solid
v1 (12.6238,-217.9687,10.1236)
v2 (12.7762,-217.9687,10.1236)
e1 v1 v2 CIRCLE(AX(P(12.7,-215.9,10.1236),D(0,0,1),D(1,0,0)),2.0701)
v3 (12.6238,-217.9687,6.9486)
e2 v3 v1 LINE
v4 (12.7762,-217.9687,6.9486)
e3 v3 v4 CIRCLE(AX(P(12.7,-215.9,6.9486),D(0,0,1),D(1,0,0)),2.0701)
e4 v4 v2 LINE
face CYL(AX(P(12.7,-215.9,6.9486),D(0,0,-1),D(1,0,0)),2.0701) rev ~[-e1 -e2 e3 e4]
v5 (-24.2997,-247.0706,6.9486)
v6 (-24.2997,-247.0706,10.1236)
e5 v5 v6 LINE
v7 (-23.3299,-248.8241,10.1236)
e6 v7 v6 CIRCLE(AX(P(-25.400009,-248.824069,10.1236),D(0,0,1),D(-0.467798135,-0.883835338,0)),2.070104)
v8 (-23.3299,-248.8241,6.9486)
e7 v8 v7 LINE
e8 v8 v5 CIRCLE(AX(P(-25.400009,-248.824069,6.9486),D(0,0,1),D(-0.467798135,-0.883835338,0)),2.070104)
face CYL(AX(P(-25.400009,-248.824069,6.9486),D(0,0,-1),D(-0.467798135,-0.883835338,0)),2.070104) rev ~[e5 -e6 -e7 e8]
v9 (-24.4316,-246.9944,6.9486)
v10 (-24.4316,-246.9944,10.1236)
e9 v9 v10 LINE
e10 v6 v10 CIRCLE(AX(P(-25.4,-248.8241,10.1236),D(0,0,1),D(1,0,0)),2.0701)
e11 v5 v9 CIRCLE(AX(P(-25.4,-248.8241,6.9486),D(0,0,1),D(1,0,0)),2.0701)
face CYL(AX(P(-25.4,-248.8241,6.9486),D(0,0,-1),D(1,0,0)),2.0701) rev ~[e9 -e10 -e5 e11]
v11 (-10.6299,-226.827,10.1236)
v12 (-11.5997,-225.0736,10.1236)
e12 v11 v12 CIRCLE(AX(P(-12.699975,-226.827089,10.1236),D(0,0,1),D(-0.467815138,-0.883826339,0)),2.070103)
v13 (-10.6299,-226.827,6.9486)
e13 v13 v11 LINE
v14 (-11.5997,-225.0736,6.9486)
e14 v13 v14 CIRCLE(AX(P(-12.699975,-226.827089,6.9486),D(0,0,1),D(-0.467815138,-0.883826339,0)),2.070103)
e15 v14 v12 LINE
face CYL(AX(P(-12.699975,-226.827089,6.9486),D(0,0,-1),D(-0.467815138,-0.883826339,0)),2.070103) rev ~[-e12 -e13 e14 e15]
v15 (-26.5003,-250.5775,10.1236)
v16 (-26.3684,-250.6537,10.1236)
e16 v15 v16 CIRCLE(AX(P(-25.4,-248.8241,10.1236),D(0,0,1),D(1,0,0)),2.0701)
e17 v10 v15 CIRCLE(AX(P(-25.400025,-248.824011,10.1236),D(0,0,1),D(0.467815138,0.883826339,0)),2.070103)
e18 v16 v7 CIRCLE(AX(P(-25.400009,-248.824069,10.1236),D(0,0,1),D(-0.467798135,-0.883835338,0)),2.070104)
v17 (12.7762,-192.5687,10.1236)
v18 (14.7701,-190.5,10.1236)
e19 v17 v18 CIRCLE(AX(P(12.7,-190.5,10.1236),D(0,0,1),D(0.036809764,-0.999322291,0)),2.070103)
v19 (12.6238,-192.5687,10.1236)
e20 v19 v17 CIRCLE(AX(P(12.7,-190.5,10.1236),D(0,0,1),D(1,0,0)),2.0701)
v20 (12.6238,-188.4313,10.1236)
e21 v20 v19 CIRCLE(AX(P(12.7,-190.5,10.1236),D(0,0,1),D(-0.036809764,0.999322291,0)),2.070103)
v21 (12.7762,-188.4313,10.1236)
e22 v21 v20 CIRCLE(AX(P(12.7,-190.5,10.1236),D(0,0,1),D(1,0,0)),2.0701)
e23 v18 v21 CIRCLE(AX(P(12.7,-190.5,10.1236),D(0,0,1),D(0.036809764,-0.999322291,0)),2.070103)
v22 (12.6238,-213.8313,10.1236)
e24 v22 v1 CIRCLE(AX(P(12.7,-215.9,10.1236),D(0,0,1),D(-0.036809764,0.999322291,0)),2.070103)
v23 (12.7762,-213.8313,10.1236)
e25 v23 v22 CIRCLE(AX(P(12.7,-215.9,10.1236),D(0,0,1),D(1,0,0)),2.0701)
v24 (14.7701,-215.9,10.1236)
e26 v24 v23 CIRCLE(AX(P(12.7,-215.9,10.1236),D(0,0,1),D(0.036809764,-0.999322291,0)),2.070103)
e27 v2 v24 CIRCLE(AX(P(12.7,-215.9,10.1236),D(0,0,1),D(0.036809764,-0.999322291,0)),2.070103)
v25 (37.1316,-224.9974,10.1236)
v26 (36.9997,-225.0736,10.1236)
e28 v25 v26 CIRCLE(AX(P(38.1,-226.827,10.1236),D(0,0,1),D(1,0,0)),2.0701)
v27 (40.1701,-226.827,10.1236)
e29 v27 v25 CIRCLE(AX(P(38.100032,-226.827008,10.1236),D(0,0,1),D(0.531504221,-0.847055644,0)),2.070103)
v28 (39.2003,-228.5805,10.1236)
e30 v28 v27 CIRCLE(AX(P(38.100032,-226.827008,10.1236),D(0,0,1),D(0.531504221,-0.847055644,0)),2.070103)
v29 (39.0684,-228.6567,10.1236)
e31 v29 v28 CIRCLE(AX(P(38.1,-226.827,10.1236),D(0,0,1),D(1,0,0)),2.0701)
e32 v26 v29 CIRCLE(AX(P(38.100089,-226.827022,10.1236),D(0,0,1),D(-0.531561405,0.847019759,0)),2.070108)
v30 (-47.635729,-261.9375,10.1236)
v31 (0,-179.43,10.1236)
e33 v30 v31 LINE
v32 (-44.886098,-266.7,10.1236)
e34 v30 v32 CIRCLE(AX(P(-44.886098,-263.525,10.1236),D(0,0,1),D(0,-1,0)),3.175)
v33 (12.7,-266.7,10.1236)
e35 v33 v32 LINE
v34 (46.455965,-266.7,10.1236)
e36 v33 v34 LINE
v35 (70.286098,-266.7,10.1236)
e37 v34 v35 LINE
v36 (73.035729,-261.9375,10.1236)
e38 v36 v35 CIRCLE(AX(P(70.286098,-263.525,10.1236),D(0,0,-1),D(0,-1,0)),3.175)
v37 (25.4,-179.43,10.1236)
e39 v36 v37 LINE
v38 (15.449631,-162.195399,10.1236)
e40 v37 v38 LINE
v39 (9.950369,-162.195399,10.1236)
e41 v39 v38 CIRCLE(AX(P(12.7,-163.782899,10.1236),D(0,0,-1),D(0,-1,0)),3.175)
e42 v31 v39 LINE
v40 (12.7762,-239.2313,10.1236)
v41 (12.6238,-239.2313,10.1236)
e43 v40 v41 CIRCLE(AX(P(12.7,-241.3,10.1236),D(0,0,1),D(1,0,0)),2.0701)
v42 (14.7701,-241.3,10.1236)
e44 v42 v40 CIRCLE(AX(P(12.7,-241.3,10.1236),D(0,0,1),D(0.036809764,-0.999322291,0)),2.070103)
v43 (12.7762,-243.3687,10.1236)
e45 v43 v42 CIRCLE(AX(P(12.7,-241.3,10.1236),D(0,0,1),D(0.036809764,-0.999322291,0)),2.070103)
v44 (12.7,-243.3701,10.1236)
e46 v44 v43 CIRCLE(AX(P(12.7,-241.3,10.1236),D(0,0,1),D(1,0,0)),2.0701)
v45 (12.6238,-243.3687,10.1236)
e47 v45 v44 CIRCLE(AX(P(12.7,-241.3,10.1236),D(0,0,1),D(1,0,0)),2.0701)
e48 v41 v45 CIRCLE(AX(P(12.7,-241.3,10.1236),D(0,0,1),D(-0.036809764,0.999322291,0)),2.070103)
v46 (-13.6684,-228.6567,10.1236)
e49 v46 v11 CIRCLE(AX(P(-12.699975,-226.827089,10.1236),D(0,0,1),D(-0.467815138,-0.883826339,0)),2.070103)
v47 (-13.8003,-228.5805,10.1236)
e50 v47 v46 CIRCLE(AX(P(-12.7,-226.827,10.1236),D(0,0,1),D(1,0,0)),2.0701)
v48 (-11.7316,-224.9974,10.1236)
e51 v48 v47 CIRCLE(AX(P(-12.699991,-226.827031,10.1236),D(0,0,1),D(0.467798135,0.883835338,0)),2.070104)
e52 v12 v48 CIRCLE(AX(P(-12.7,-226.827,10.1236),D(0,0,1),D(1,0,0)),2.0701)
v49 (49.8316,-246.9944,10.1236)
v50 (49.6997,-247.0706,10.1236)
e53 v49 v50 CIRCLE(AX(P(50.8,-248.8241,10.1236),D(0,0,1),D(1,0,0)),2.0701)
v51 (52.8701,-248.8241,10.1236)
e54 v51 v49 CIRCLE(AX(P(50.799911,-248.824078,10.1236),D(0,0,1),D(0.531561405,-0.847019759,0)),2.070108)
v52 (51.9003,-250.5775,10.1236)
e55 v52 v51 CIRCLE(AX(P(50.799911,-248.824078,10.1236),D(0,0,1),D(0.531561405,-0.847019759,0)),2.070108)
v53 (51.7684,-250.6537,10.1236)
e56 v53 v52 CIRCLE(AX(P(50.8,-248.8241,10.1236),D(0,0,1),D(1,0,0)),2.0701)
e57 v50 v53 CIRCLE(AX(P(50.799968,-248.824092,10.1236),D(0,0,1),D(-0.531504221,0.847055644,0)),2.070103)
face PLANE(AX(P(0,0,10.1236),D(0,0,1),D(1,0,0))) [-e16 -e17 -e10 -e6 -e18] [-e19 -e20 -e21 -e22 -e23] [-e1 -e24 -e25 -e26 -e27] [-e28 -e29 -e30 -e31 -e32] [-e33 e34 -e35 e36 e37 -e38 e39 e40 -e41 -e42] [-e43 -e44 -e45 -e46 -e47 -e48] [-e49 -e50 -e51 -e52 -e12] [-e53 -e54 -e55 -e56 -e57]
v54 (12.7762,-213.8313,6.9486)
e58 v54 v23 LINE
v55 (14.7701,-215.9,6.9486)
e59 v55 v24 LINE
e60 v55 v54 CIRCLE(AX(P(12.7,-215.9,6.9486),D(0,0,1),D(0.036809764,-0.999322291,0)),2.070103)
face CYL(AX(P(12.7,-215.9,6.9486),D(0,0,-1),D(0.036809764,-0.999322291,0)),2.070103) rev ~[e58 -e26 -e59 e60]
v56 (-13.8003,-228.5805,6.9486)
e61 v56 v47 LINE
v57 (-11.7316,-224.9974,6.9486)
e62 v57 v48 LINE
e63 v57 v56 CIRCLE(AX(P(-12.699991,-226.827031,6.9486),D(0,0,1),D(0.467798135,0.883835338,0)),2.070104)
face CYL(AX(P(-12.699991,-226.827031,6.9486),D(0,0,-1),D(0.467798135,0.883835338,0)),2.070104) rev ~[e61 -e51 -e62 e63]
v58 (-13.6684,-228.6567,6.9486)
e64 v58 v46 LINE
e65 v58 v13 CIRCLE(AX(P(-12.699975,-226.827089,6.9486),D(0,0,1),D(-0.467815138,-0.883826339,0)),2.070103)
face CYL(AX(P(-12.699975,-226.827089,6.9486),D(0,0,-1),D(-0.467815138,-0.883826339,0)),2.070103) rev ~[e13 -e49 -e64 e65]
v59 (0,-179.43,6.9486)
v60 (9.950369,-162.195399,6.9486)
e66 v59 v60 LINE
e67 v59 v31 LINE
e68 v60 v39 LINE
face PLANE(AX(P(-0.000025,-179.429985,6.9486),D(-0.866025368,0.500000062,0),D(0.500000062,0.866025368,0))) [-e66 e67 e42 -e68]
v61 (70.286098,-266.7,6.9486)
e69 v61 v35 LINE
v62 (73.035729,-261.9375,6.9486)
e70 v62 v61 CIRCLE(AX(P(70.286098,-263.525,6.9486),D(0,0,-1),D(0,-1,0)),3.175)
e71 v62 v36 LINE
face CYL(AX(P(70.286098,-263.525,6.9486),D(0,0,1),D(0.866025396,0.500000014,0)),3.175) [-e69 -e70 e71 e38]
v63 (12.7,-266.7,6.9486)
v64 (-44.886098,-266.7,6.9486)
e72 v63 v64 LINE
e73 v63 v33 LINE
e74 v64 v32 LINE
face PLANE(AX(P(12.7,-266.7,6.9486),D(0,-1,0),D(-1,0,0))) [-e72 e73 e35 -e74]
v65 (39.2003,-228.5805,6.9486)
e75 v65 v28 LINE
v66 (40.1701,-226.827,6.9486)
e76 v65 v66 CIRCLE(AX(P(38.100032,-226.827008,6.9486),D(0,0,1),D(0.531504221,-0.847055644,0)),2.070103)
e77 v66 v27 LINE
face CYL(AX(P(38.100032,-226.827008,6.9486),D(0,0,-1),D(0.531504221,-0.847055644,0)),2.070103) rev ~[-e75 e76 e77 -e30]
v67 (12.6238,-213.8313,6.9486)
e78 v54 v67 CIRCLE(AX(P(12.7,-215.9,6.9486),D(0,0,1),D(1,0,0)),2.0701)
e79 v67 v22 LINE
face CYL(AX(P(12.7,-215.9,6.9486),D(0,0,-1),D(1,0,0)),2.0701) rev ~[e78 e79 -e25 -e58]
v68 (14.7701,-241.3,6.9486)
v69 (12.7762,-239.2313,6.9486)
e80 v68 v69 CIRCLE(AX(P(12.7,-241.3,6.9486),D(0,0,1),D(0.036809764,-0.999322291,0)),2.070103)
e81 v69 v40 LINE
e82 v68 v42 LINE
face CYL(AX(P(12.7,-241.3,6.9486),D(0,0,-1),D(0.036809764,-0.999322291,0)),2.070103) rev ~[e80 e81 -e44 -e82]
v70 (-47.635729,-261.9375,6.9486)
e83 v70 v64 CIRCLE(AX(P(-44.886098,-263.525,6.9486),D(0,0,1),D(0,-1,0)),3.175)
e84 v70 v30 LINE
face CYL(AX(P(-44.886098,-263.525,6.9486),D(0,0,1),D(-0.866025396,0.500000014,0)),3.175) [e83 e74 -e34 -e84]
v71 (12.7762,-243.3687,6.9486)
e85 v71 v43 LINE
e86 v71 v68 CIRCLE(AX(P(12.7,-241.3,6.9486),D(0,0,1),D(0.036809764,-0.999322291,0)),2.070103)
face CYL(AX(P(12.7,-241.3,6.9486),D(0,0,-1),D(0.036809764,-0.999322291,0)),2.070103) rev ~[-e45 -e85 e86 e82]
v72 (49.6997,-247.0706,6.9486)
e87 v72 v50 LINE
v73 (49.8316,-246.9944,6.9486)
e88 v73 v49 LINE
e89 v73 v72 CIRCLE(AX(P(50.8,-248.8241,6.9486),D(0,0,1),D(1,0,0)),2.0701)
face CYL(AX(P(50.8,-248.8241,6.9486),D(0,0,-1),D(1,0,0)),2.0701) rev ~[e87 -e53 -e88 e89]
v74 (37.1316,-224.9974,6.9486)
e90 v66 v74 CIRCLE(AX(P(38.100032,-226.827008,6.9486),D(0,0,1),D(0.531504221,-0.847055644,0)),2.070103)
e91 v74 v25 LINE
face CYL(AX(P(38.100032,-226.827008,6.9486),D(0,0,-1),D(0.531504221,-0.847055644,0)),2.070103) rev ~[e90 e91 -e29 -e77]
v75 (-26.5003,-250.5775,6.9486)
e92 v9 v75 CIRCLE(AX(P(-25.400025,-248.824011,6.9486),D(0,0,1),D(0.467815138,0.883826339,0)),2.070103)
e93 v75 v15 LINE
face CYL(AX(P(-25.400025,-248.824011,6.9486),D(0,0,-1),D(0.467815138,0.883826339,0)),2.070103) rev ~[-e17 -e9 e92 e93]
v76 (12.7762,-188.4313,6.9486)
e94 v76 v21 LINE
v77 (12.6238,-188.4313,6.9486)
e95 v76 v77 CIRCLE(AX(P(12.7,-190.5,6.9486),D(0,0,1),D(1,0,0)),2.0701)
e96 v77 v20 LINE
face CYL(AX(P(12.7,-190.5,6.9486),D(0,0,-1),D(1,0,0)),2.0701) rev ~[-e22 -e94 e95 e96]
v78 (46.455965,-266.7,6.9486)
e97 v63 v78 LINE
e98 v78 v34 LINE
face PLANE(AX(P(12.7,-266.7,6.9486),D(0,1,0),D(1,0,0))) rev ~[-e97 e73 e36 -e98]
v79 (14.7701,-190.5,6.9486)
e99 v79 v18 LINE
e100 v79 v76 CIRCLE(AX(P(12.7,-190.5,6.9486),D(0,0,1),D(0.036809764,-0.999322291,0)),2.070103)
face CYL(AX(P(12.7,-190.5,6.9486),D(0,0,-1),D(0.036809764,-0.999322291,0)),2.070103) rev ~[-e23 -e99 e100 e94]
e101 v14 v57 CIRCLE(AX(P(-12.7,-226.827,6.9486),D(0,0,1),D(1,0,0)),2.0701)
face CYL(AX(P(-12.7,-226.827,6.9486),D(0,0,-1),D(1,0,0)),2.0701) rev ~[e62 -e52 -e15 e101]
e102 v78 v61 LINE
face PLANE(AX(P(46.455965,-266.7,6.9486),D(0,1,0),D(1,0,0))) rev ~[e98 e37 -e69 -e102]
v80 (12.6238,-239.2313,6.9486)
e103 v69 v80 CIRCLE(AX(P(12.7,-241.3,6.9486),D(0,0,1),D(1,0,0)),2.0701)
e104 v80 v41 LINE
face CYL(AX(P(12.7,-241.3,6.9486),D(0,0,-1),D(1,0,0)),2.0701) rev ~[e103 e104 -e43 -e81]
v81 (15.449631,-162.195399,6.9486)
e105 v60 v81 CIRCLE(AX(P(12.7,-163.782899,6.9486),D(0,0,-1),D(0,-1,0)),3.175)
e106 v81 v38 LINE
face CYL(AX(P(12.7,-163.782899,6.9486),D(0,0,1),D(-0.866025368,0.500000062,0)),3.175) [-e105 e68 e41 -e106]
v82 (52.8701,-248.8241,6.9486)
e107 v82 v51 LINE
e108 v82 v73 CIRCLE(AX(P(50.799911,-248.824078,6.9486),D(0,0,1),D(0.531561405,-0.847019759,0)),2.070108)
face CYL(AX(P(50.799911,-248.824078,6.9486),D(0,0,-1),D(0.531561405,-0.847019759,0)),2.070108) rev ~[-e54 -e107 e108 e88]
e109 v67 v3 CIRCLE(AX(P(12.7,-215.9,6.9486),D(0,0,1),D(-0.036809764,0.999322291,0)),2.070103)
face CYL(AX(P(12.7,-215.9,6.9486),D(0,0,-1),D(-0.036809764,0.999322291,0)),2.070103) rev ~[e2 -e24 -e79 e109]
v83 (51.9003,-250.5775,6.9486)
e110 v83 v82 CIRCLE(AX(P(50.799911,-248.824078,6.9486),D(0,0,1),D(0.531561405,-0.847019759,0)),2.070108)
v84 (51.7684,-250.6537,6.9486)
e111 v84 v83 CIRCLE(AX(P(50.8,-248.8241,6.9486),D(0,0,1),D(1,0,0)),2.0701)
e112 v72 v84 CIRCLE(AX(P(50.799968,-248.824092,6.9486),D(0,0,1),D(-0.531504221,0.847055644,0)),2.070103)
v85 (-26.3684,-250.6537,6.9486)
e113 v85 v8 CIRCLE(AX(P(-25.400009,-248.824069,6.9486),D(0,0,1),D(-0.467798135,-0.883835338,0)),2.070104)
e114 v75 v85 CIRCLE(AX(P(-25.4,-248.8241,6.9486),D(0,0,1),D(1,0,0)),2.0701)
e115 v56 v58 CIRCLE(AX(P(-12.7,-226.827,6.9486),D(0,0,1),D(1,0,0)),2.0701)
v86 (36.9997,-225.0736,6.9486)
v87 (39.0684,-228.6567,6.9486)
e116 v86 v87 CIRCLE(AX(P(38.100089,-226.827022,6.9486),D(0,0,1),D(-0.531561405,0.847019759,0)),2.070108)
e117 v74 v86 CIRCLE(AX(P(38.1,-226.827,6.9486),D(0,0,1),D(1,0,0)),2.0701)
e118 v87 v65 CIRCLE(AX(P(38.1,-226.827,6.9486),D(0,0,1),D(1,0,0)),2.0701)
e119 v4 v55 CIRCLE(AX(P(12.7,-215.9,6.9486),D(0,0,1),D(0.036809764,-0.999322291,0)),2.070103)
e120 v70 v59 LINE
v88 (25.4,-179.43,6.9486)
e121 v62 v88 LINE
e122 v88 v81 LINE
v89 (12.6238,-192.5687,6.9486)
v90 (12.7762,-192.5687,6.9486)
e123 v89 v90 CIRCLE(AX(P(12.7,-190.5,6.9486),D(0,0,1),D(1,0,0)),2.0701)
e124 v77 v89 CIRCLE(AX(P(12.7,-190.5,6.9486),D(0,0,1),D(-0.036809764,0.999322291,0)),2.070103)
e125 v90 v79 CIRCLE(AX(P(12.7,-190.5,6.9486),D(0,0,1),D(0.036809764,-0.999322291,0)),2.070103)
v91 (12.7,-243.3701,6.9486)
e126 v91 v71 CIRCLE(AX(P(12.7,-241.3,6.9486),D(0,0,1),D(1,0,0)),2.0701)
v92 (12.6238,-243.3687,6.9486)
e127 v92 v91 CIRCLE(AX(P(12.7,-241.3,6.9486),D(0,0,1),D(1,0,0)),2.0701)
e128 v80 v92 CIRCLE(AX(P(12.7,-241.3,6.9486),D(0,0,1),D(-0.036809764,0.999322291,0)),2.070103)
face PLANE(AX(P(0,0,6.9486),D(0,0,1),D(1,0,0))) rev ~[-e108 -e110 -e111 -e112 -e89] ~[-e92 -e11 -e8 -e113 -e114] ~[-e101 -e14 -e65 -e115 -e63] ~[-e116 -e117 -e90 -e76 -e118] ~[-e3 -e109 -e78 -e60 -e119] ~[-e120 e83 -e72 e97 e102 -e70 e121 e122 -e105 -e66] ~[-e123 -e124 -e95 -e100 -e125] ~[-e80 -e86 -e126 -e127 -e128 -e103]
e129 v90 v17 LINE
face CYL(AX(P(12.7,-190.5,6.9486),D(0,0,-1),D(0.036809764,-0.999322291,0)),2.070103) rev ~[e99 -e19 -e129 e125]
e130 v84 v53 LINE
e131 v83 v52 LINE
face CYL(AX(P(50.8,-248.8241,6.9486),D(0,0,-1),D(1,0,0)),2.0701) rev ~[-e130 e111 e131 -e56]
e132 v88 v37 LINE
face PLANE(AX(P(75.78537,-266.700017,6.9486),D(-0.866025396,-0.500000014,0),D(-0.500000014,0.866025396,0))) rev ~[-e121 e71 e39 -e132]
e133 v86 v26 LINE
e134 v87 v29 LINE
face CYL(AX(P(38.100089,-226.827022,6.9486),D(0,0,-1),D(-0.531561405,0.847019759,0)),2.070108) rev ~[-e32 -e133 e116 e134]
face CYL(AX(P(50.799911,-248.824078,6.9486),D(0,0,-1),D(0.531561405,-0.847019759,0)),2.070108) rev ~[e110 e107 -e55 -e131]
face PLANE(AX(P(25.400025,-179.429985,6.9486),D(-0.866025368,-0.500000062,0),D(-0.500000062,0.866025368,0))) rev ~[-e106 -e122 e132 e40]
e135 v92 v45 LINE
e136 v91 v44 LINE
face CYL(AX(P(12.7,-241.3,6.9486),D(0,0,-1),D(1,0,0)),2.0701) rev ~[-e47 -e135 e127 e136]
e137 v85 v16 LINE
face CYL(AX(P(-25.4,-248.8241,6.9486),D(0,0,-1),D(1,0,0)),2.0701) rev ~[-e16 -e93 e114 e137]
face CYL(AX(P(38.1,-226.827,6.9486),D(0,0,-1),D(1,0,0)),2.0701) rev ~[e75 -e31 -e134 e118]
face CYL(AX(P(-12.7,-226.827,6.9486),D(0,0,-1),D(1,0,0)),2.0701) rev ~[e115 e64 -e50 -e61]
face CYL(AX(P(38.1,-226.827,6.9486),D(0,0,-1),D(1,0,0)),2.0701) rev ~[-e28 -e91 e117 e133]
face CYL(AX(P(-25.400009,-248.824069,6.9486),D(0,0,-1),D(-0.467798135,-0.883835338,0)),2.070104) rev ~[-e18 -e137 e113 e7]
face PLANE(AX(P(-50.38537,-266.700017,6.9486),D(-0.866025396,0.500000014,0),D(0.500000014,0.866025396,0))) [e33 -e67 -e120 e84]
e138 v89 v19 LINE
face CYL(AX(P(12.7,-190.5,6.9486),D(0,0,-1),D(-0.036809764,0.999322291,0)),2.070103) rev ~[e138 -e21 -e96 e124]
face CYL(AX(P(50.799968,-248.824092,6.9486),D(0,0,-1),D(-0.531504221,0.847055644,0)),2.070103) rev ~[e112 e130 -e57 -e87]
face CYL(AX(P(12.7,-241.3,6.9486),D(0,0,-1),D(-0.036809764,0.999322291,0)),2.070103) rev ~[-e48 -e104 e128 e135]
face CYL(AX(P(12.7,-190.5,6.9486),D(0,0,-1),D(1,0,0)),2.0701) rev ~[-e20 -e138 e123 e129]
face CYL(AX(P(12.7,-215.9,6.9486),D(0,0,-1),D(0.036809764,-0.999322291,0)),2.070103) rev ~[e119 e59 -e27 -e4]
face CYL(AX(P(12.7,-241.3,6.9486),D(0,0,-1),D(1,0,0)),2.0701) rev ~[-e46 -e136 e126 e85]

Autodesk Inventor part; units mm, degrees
ref_plane "YZ Plane" through (0, 0, 0) normal (1, 0, 0) x (0, 1, 0)
ref_plane "XZ Plane" through (0, 0, 0) normal (0, 1, 0) x (-1, 0, 0)
ref_plane "XY Plane" through (0, 0, 0) normal (0, 0, 1) x (1, 0, 0)
ref_plane "Work Plane1" through (0, 0, 6.9486) normal (0, 0, 1) x (1, 0, 0)
sketch "Sketch1" plane through (0, 0, 6.9486) normal (0, 0, 1) x (1, 0, 0)
  line L0 (-228.6, -575.3768) -> (0, -179.43) projected
  line L1 (254, -575.3768) -> (25.4, -179.43) projected
  line L2 (254, -626.1768) -> (25.4, -230.23) projected
  arc A0 (51.9003, -250.5775) -> (49.8316, -246.9944) centre (50.8, -248.8241) ccw projected
  arc A1 (49.6997, -247.0706) -> (51.7684, -250.6537) centre (50.8, -248.8241) ccw projected
  arc A2 (39.2003, -228.5805) -> (37.1316, -224.9974) centre (38.1, -226.827) ccw projected
  arc A3 (36.9997, -225.0736) -> (39.0684, -228.6567) centre (38.1, -226.827) ccw projected
  arc A4 (12.7762, -217.9687) -> (12.7762, -213.8313) centre (12.7, -215.9) ccw projected
  arc A5 (12.6238, -213.8313) -> (12.6238, -217.9687) centre (12.7, -215.9) ccw projected
  arc A6 (12.6238, -188.4313) -> (12.6238, -192.5687) centre (12.7, -190.5) ccw projected
  arc A7 (12.7762, -192.5687) -> (12.7762, -188.4313) centre (12.7, -190.5) ccw projected
  arc A8 (12.7762, -243.3687) -> (12.7762, -239.2313) centre (12.7, -241.3) ccw projected
  arc A9 (12.6238, -239.2313) -> (12.6238, -243.3687) centre (12.7, -241.3) ccw projected
  arc A10 (-26.3684, -250.6537) -> (-24.2997, -247.0706) centre (-25.4, -248.8241) ccw projected
  arc A11 (-24.4316, -246.9944) -> (-26.5003, -250.5775) centre (-25.4, -248.8241) ccw projected
  arc A12 (-13.6684, -228.6567) -> (-11.5997, -225.0736) centre (-12.7, -226.827) ccw projected
  arc A13 (-11.7316, -224.9974) -> (-13.8003, -228.5805) centre (-12.7, -226.827) ccw projected
  line L3 (12.7, -241.3) -> (12.7, -266.7)
  line L4 (12.7, -266.7) -> (-50.3854, -266.7)
  line L5 (12.7, -266.7) -> (75.7854, -266.7)
  line L6 (75.7854, -266.7) -> (12.7, -157.4329)
  line L7 (-50.3854, -266.7) -> (12.7, -157.4329)
  circle A14 centre (12.7, -190.5) radius 2.0701
  circle A15 centre (12.7, -215.9) radius 2.0701
  circle A16 centre (12.7, -241.3) radius 2.0701
  circle A17 centre (-25.4, -248.8241) radius 2.0701
  circle A18 centre (-12.7, -226.827) radius 2.0701
  circle A19 centre (50.8, -248.8241) radius 2.0701
  circle A20 centre (38.1, -226.827) radius 2.0701
  point P0 (0, 0)
  dimension "d0" = 25.4
extrude "Extrusion1" add sketch "Sketch1" along normal blind 3.175
fillet "Fillet1" radius 3.175 3 edges at (12.7, -157.4329, 8.5361) (-50.3854, -266.7, 8.5361) (75.7854, -266.7, 8.5361)
properties part number "jointplate" material "Aluminum 6061"
